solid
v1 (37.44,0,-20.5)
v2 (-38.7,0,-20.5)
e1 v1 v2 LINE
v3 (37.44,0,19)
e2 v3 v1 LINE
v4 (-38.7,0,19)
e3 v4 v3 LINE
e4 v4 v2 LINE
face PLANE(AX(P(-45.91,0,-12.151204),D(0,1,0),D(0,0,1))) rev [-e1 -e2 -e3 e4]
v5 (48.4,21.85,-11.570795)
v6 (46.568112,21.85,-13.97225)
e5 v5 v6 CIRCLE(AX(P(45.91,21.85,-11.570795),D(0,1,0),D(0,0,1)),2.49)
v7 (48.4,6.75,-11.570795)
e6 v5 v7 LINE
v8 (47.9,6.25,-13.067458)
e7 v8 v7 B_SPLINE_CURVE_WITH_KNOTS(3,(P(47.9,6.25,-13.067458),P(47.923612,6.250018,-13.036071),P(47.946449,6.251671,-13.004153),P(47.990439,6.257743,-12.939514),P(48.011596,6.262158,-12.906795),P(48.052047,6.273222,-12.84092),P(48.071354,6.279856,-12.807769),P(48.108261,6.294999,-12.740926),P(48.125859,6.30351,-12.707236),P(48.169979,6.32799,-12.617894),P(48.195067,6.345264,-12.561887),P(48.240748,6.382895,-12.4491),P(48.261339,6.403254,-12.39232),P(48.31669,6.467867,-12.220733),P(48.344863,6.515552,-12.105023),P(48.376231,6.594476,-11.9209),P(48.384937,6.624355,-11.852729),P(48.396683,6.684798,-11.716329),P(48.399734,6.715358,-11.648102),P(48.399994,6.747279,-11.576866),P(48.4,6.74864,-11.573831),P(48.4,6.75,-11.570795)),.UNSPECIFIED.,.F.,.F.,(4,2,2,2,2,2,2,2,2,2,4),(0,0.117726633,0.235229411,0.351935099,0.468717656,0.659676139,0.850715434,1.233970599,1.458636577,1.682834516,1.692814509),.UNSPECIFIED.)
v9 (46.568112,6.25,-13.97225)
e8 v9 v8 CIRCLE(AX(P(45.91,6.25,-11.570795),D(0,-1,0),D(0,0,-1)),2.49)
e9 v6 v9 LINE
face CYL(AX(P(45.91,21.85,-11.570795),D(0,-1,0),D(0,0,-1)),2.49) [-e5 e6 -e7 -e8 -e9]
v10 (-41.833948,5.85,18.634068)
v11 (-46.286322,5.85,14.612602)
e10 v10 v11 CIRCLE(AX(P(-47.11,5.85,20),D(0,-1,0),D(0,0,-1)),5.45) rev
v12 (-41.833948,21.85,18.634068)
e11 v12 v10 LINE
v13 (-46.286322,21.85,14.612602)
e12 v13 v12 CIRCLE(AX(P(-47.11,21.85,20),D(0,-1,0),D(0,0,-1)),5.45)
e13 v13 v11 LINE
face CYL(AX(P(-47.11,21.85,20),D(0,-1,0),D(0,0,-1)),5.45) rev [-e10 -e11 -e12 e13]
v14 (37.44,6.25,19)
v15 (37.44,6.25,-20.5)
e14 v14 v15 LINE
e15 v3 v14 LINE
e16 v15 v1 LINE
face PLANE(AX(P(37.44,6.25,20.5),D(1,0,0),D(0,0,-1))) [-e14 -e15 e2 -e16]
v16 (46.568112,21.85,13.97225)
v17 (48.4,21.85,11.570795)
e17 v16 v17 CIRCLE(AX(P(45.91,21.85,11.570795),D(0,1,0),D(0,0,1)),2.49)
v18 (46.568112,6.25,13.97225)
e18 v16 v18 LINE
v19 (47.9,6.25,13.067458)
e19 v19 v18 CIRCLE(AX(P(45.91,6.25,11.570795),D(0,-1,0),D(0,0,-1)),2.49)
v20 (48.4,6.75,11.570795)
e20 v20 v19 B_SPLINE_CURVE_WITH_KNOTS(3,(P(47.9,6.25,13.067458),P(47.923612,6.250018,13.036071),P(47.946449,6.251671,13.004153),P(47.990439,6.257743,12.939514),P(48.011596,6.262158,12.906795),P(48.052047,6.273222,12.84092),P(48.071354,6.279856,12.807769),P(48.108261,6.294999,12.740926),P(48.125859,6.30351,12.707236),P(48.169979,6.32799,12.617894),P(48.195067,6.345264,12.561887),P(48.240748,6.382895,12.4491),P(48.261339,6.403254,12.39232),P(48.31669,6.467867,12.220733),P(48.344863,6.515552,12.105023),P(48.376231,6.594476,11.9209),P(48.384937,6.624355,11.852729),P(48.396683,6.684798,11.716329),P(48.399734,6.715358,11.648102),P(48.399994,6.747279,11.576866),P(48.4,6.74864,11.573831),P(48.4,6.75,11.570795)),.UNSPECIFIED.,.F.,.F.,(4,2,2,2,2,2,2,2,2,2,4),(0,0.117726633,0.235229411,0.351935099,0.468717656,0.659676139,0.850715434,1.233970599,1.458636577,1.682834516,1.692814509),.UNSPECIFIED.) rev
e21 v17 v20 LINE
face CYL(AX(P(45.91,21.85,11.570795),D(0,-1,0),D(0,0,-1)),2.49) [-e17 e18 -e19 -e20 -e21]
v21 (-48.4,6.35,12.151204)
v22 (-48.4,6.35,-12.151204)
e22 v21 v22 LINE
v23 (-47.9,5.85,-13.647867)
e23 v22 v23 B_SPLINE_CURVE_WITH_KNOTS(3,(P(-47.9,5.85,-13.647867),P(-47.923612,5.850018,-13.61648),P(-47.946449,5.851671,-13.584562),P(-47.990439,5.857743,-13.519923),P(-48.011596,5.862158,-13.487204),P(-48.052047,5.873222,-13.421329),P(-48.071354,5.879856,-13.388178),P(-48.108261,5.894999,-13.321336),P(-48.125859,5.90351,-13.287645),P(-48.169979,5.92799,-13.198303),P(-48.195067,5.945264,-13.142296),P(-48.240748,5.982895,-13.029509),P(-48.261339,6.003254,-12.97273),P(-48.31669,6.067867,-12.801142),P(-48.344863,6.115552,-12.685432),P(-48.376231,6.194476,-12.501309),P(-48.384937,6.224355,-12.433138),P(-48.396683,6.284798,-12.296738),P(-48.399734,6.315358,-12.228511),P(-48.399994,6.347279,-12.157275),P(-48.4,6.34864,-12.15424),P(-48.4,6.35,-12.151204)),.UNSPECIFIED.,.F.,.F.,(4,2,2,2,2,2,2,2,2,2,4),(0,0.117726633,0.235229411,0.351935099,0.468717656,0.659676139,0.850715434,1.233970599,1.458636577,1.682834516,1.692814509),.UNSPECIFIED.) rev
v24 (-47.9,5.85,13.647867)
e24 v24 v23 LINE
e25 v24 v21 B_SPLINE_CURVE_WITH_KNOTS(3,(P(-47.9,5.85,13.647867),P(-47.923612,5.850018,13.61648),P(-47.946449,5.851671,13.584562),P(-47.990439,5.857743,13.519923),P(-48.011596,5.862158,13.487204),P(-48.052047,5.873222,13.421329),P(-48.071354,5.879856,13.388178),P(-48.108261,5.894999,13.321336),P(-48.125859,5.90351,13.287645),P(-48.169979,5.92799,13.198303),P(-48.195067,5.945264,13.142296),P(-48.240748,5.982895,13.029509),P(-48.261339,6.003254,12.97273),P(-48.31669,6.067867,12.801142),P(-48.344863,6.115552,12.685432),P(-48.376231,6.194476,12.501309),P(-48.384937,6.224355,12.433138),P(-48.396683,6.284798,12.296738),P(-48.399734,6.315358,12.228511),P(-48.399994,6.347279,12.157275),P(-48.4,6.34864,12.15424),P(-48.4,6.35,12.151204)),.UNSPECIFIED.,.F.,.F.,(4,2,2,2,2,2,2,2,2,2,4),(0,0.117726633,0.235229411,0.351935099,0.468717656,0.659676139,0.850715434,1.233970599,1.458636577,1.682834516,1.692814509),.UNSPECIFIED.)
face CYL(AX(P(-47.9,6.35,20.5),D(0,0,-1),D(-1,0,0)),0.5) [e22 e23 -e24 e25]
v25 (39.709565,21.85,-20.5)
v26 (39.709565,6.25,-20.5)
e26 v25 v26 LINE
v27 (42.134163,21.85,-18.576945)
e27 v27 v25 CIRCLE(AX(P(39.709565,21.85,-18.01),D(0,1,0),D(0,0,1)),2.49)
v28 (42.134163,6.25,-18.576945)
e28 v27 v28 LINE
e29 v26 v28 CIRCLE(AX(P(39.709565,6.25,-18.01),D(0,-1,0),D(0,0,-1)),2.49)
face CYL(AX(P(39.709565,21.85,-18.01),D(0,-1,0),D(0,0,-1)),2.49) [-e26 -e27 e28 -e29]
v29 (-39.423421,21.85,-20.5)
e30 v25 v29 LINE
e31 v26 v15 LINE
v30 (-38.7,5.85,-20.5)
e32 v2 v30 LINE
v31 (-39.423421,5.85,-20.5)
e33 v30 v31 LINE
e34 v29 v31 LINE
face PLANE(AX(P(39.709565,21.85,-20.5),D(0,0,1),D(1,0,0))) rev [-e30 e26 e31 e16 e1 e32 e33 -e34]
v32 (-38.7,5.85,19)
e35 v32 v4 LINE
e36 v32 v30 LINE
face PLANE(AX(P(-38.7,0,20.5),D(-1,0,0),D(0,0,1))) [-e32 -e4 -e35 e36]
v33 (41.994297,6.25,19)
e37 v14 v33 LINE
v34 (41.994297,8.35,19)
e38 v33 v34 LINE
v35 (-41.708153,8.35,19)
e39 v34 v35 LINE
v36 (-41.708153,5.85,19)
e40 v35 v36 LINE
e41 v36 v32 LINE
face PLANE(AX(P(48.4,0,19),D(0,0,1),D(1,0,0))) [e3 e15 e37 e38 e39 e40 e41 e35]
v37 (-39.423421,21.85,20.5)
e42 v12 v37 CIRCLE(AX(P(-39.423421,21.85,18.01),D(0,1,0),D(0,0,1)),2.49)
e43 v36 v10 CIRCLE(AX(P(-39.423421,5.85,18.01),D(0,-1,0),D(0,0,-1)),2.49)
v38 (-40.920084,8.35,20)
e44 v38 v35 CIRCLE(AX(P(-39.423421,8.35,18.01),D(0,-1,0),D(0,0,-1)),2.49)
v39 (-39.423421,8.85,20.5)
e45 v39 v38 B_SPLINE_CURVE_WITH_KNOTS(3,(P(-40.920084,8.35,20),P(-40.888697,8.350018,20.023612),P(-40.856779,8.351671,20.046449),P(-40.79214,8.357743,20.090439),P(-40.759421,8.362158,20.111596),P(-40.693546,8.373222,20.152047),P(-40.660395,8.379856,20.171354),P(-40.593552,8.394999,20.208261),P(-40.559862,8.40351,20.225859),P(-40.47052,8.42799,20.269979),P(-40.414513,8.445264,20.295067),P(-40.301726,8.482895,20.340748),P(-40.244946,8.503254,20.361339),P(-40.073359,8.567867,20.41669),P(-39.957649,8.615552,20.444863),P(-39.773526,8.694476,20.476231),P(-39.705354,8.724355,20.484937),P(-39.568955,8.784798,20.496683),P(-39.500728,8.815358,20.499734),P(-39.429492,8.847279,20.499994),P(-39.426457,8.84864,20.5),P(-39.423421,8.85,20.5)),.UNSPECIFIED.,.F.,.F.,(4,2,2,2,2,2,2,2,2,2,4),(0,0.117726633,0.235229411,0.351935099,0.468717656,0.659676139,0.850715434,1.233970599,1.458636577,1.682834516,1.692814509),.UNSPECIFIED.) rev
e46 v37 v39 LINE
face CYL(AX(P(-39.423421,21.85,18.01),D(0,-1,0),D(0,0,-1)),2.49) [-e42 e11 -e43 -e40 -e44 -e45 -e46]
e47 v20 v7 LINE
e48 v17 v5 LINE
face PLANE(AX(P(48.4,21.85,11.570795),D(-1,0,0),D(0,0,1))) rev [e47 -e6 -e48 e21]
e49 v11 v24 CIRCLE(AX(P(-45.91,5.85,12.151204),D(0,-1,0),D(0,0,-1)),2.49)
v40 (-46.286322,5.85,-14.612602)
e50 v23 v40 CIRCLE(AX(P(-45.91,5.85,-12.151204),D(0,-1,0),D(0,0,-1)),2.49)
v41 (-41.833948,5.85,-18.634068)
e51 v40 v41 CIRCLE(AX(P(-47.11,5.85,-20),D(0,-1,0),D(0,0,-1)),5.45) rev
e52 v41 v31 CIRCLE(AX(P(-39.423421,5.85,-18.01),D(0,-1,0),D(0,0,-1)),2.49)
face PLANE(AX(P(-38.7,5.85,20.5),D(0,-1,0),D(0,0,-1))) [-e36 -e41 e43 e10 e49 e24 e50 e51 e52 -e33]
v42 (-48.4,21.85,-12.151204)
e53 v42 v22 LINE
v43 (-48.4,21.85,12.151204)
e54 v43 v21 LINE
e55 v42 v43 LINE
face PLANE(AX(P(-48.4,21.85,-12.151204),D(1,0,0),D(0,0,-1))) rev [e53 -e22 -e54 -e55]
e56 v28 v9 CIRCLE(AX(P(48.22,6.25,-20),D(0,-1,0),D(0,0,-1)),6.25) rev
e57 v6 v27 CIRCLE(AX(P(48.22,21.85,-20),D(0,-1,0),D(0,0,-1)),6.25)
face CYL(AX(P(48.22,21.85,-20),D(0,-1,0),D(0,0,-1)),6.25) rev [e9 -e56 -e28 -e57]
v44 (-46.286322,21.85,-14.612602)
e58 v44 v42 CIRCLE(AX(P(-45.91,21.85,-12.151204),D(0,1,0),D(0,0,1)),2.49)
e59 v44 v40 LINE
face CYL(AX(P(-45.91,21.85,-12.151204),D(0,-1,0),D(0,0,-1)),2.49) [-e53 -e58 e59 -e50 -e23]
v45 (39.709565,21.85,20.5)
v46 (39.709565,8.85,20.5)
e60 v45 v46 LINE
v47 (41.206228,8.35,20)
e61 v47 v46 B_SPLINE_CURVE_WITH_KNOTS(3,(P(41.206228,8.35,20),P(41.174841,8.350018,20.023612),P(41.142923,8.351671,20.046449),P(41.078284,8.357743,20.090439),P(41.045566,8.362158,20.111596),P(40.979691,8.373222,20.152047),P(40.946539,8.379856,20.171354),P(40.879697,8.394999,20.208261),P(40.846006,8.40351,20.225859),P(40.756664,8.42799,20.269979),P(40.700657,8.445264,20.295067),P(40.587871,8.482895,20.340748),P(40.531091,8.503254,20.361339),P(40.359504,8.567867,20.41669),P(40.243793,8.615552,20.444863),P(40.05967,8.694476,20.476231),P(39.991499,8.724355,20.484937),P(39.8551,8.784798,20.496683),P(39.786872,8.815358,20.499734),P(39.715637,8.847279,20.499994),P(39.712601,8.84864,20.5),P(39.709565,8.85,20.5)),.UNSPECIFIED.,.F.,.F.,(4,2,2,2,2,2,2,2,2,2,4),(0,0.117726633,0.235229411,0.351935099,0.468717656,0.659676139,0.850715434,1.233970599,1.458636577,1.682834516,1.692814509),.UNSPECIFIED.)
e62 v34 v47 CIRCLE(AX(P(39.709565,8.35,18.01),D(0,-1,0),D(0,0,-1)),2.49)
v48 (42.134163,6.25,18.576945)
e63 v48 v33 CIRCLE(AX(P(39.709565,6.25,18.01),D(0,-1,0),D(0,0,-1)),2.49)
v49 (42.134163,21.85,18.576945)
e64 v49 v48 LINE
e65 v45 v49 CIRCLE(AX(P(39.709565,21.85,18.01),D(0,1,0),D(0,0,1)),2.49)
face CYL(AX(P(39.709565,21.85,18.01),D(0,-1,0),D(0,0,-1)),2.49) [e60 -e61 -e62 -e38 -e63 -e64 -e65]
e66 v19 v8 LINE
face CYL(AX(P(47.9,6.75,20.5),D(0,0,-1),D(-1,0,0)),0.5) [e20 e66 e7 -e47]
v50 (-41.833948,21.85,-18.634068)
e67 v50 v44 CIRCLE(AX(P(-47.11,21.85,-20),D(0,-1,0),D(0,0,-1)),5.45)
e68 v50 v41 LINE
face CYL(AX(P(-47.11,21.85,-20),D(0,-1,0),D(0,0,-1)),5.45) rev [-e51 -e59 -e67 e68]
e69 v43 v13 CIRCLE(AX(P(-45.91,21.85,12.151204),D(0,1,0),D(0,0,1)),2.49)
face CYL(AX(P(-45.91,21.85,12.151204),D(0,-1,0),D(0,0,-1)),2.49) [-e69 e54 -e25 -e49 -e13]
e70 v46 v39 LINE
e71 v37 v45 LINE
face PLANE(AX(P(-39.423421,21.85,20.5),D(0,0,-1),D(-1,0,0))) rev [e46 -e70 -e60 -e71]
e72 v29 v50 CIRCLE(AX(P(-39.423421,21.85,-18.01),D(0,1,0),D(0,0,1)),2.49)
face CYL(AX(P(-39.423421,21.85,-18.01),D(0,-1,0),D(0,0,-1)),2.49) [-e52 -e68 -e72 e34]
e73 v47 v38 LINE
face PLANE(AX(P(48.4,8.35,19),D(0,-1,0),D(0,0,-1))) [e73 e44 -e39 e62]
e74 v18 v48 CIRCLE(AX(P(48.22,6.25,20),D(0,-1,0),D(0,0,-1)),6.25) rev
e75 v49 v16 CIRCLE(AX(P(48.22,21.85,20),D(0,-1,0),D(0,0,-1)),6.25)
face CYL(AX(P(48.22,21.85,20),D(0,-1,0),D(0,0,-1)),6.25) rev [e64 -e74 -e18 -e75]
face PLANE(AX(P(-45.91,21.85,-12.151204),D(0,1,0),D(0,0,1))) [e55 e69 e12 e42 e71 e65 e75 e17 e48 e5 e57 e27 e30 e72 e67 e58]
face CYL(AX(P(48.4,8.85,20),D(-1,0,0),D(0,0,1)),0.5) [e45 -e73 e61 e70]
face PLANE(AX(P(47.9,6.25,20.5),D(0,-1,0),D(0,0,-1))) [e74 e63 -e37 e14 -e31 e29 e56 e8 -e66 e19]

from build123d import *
from OCP.BRepAlgoAPI import BRepAlgoAPI_Cut
from OCP.TopTools import TopTools_ListOfShape

# Parameters (mm, degrees)
BOSS_EXTRUDE1_DEPTH     = 21.85
CUT_EXTRUDE1_DEPTH      = 48.4
CUT_EXTRUDE1_DEPTH_BACK = 48.4
CUT_EXTRUDE2_DEPTH      = 20.5
CUT_EXTRUDE2_DEPTH_BACK = 20.5


with BuildPart() as part:
    # Sketch1 → Boss-Extrude1 (new body)
    with BuildSketch(Plane(origin=(0, 0, 0), x_dir=(1, 0, 0), z_dir=(0, 1, 0))):
        with BuildLine():
            Line((-48.4, 12.151203914), (-48.4, -12.151203914))
            ThreePointArc((-48.4, -12.151203914), (-47.79906628, -13.773402604), (-46.286322418, -14.612602183))
            ThreePointArc((-46.286322418, -14.612602183), (-43.456956945, -15.955525197), (-41.833947517, -18.63406801))
            ThreePointArc((-41.833947517, -18.63406801), (-40.94758788, -19.979013629), (-39.423420787, -20.5))
            Line((-39.423420787, -20.5), (39.709565228, -20.5))
            ThreePointArc((39.709565228, -20.5), (41.256886583, -19.960870735), (42.134162778, -18.57694508))
            ThreePointArc((42.134162778, -18.57694508), (43.717900388, -15.664841516), (46.568112128, -13.972250299))
            ThreePointArc((46.568112128, -13.972250299), (47.889747358, -13.080993613), (48.4, -11.570794818))
            Line((48.4, -11.570794818), (48.4, 11.570794818))
            ThreePointArc((48.4, 11.570794818), (47.889747358, 13.080993613), (46.568112128, 13.972250299))
            ThreePointArc((46.568112128, 13.972250299), (43.717900388, 15.664841516), (42.134162778, 18.57694508))
            ThreePointArc((42.134162778, 18.57694508), (41.256886583, 19.960870735), (39.709565228, 20.5))
            Line((39.709565228, 20.5), (-39.423420787, 20.5))
            ThreePointArc((-39.423420787, 20.5), (-40.94758788, 19.979013629), (-41.833947517, 18.63406801))
            ThreePointArc((-41.833947517, 18.63406801), (-43.456956895, 15.955525241), (-46.286322286, 14.612602203))
            ThreePointArc((-46.286322286, 14.612602203), (-47.799066237, 13.773402654), (-48.4, 12.151203914))
        make_face()
    extrude(amount=BOSS_EXTRUDE1_DEPTH)

    # Sketch2 → Cut-Extrude1 (cut, two sides: drawn at the far end of the back side and taken through both)
    with BuildSketch(Plane(origin=(0, 0, 0), x_dir=(0, 0, -1), z_dir=(1, 0, 0)).offset(-CUT_EXTRUDE1_DEPTH_BACK)):
        with BuildLine():
            Line((-20.5, 8.85), (-20.5, 0))
            Line((-20.5, 0), (-19, 0))
            Line((-19, 0), (-19, 8.35))
            Line((-19, 8.35), (-20, 8.35))
            ThreePointArc((-20, 8.35), (-20.353553391, 8.496446609), (-20.5, 8.85))
        make_face()
    extrude(amount=CUT_EXTRUDE1_DEPTH + CUT_EXTRUDE1_DEPTH_BACK, mode=Mode.SUBTRACT)


with BuildPart() as cut_extrude2_tool:
    # Sketch3 → Cut-Extrude2 (new, two sides: drawn at the far end of the back side and taken through both)
    with BuildSketch(Plane.XY.offset(-CUT_EXTRUDE2_DEPTH_BACK)):
        with BuildLine():
            Line((-48.4, -5), (48.4, -5))
            Line((48.4, -5), (48.4, 6.75))
            ThreePointArc((48.4, 6.75), (48.253553391, 6.396446609), (47.9, 6.25))
            Line((47.9, 6.25), (37.44, 6.25))
            Line((37.44, 6.25), (37.44, 0))
            Line((37.44, 0), (-38.7, 0))
            Line((-38.7, 0), (-38.7, 5.85))
            Line((-38.7, 5.85), (-47.9, 5.85))
            ThreePointArc((-47.9, 5.85), (-48.253553391, 5.996446609), (-48.4, 6.35))
            Line((-48.4, 6.35), (-48.4, -5))
        make_face()
    extrude(amount=CUT_EXTRUDE2_DEPTH + CUT_EXTRUDE2_DEPTH_BACK)


with BuildPart() as part_1:
    add(part.part)

    # Cut-Extrude2: cut by cut_extrude2_tool, with a tolerance
    cut_extrude2_stock = TopTools_ListOfShape()
    cut_extrude2_stock.Append(part_1.part.wrapped)
    cut_extrude2_tools = TopTools_ListOfShape()
    cut_extrude2_tools.Append(cut_extrude2_tool.part.wrapped)
    cut_extrude2_cut = BRepAlgoAPI_Cut()
    cut_extrude2_cut.SetArguments(cut_extrude2_stock)
    cut_extrude2_cut.SetTools(cut_extrude2_tools)
    cut_extrude2_cut.SetFuzzyValue(0.00001)
    cut_extrude2_cut.Build()
    add(Compound.cast(cut_extrude2_cut.Shape()).solids(), mode=Mode.REPLACE)


solid = part_1.part
